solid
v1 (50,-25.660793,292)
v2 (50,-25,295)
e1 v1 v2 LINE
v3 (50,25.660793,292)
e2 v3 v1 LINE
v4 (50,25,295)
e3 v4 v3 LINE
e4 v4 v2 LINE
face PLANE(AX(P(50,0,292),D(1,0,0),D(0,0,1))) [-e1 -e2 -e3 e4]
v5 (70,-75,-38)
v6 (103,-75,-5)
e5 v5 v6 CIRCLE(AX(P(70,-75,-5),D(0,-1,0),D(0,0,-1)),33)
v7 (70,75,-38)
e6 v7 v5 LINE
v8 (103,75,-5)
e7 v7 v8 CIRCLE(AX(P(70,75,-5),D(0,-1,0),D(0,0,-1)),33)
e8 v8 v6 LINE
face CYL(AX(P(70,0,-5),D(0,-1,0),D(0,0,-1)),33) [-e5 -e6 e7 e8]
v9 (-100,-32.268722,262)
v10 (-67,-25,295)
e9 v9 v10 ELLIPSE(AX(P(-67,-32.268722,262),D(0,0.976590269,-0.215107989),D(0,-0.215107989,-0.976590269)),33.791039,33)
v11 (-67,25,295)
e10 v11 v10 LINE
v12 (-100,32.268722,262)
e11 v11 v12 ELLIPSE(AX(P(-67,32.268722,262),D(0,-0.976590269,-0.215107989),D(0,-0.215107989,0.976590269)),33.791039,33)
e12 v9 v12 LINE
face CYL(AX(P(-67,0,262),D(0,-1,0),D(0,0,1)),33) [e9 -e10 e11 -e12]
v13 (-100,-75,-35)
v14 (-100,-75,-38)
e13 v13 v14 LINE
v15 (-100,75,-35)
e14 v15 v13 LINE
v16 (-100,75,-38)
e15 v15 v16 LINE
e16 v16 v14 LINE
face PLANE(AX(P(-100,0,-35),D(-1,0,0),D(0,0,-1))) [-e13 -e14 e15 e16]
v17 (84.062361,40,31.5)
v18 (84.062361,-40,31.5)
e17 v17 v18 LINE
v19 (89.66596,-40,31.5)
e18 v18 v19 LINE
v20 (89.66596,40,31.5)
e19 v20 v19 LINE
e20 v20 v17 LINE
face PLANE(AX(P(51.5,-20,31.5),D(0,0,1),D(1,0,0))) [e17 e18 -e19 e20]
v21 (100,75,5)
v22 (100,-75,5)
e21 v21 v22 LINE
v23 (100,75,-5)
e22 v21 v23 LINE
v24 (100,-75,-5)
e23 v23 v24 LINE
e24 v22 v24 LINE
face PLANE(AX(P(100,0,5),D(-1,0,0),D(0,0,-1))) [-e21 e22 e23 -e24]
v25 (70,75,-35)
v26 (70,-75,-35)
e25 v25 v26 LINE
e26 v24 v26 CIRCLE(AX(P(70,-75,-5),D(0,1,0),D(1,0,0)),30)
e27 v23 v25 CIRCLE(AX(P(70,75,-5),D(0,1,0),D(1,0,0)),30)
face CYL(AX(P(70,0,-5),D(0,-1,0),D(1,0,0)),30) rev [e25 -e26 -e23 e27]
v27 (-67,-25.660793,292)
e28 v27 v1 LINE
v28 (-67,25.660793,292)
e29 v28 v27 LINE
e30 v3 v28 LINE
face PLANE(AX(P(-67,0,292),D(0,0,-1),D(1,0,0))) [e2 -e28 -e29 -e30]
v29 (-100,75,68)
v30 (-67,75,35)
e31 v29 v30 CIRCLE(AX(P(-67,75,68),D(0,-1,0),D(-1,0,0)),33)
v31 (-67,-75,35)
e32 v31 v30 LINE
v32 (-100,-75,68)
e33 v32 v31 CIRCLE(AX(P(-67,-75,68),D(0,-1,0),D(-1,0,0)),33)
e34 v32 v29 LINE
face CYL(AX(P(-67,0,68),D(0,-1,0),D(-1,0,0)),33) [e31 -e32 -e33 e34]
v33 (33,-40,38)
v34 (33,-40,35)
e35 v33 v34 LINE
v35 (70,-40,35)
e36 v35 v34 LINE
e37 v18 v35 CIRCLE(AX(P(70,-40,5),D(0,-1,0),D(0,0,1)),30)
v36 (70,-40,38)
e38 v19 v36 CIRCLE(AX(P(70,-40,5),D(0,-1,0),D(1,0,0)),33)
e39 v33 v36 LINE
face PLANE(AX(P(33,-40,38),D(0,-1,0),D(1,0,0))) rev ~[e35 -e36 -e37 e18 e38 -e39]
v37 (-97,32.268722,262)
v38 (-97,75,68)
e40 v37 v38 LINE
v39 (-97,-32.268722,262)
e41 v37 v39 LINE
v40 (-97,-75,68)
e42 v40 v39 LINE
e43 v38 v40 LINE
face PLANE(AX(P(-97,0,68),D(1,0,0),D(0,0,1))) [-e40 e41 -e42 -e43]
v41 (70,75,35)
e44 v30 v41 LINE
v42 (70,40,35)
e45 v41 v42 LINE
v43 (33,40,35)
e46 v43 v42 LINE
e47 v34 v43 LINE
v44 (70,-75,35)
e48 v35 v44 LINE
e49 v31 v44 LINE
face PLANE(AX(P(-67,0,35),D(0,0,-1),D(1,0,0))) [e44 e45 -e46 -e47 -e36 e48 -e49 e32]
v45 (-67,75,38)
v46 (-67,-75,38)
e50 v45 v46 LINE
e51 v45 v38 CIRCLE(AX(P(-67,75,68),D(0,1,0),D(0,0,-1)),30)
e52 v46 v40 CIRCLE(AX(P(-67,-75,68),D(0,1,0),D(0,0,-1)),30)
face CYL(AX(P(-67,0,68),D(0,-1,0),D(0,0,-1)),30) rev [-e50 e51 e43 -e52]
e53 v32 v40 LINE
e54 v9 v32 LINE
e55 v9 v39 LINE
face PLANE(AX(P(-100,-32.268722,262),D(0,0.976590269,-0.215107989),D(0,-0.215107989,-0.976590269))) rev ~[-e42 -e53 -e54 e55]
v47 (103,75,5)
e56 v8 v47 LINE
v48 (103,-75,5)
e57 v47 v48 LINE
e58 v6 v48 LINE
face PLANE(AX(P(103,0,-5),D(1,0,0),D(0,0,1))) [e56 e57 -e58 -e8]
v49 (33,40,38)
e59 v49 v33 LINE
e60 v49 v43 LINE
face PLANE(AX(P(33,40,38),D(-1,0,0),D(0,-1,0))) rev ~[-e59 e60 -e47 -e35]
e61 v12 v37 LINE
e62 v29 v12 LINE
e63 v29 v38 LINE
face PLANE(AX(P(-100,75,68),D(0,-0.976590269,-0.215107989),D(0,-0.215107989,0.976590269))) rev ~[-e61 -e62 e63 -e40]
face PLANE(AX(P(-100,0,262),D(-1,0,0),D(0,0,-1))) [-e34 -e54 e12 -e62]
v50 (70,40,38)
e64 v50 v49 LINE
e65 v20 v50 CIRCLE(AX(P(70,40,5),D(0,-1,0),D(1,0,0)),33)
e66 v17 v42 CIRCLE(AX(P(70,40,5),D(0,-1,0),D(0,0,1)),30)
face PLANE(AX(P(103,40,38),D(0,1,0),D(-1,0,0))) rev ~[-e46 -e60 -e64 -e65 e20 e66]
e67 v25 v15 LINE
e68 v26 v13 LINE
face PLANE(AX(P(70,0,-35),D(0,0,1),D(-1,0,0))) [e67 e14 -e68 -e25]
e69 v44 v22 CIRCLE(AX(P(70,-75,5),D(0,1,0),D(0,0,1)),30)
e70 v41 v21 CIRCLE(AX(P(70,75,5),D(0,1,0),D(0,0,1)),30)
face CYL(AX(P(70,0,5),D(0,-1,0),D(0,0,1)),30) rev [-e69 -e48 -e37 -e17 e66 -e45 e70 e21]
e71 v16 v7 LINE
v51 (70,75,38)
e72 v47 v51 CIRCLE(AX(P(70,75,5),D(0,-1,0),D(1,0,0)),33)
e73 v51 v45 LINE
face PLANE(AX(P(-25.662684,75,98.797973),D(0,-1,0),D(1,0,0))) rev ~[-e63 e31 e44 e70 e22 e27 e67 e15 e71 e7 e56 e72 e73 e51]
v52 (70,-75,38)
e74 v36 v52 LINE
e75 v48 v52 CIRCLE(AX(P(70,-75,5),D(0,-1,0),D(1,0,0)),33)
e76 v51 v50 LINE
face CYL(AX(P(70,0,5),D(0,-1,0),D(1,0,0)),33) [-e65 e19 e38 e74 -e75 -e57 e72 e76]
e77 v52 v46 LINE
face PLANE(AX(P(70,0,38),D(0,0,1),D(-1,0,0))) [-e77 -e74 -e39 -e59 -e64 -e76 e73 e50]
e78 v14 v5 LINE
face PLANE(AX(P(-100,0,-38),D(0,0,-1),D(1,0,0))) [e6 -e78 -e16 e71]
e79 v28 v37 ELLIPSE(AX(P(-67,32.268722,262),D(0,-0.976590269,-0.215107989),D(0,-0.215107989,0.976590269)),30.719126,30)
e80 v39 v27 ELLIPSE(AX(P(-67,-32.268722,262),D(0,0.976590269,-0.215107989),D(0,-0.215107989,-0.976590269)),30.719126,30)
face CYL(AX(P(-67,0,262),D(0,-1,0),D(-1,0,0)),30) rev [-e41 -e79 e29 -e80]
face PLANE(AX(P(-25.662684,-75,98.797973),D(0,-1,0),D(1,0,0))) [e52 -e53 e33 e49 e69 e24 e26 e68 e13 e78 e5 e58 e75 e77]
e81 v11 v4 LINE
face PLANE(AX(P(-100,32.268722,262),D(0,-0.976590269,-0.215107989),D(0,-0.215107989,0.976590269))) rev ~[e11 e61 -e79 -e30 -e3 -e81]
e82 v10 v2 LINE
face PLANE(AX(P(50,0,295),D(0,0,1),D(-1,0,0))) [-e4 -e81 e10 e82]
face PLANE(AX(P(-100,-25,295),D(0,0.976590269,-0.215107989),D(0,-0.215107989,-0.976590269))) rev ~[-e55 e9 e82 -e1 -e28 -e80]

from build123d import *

# Parameters (mm, degrees)
F1_DEPTH = 75
F3_DEPTH = 200
F4_W     = 37
F4_H     = 40
F4_W_2   = 33
F5_DEPTH = 6.5


# Not quite as in the source:
# - a feature names something its author has since deleted; it is built from what else it names


with BuildPart() as f1:
    # F0 (on Front) → F1 (new body, symmetric)
    with BuildSketch(Plane.XZ):
        with BuildLine():
            Line((-67, 35), (70, 35))
            ThreePointArc((70, 35), (91.2132034356, 26.2132034356), (100, 5))
            Line((100, 5), (100, -5))
            ThreePointArc((100, -5), (91.2132034356, -26.2132034356), (70, -35))
            Line((70, -35), (-100, -35))
            Line((-100, -35), (-100, -38))
            Line((-100, -38), (70, -38))
            ThreePointArc((70, -38), (93.3345237792, -28.3345237792), (103, -5))
            Line((103, -5), (103, 5))
            ThreePointArc((103, 5), (93.3345237792, 28.3345237792), (70, 38))
            Line((70, 38), (-67, 38))
            ThreePointArc((-67, 38), (-88.2132034356, 46.7867965644), (-97, 68))
            Line((-97, 68), (-97, 262))
            ThreePointArc((-97, 262), (-88.2132034356, 283.2132034356), (-67, 292))
            Line((-67, 292), (50, 292))
            Line((50, 292), (50, 295))
            Line((50, 295), (-67, 295))
            ThreePointArc((-67, 295), (-90.3345237792, 285.3345237792), (-100, 262))
            Line((-100, 262), (-100, 68))
            ThreePointArc((-100, 68), (-90.3345237792, 44.6654762208), (-67, 35))
        make_face()
    extrude(amount=F1_DEPTH, both=True)

    # F2 (on face) → F3 (cut)
    with BuildSketch(Plane(origin=(-100, 0, 0), x_dir=(0, -1, 0), z_dir=(-1, 0, 0))):
        Polygon((-32.268722467, 262), (-75, 262), (-75, 68), align=None)
        Polygon((-75, 295), (-75, 262), (-32.268722467, 262), (-25, 295), align=None)
        Polygon((25, 295), (32.268722467, 262), (75, 262), (75, 295), align=None)
        Polygon((32.268722467, 262), (75, 68), (75, 262), align=None)
    extrude(amount=-F3_DEPTH, mode=Mode.SUBTRACT)

    # F4 (on face) → F5 (cut, symmetric)
    with BuildSketch(Plane.XY.offset(38)):
        with Locations((51.5, -20)):
            Rectangle(F4_W, F4_H)
        with Locations((86.5, -20)):
            Rectangle(F4_W_2, F4_H)
        with Locations((86.5, 20)):
            Rectangle(F4_W_2, F4_H)
        with Locations((51.5, 20)):
            Rectangle(F4_W, F4_H)
    extrude(amount=F5_DEPTH, both=True, mode=Mode.SUBTRACT)


solid = f1.part
